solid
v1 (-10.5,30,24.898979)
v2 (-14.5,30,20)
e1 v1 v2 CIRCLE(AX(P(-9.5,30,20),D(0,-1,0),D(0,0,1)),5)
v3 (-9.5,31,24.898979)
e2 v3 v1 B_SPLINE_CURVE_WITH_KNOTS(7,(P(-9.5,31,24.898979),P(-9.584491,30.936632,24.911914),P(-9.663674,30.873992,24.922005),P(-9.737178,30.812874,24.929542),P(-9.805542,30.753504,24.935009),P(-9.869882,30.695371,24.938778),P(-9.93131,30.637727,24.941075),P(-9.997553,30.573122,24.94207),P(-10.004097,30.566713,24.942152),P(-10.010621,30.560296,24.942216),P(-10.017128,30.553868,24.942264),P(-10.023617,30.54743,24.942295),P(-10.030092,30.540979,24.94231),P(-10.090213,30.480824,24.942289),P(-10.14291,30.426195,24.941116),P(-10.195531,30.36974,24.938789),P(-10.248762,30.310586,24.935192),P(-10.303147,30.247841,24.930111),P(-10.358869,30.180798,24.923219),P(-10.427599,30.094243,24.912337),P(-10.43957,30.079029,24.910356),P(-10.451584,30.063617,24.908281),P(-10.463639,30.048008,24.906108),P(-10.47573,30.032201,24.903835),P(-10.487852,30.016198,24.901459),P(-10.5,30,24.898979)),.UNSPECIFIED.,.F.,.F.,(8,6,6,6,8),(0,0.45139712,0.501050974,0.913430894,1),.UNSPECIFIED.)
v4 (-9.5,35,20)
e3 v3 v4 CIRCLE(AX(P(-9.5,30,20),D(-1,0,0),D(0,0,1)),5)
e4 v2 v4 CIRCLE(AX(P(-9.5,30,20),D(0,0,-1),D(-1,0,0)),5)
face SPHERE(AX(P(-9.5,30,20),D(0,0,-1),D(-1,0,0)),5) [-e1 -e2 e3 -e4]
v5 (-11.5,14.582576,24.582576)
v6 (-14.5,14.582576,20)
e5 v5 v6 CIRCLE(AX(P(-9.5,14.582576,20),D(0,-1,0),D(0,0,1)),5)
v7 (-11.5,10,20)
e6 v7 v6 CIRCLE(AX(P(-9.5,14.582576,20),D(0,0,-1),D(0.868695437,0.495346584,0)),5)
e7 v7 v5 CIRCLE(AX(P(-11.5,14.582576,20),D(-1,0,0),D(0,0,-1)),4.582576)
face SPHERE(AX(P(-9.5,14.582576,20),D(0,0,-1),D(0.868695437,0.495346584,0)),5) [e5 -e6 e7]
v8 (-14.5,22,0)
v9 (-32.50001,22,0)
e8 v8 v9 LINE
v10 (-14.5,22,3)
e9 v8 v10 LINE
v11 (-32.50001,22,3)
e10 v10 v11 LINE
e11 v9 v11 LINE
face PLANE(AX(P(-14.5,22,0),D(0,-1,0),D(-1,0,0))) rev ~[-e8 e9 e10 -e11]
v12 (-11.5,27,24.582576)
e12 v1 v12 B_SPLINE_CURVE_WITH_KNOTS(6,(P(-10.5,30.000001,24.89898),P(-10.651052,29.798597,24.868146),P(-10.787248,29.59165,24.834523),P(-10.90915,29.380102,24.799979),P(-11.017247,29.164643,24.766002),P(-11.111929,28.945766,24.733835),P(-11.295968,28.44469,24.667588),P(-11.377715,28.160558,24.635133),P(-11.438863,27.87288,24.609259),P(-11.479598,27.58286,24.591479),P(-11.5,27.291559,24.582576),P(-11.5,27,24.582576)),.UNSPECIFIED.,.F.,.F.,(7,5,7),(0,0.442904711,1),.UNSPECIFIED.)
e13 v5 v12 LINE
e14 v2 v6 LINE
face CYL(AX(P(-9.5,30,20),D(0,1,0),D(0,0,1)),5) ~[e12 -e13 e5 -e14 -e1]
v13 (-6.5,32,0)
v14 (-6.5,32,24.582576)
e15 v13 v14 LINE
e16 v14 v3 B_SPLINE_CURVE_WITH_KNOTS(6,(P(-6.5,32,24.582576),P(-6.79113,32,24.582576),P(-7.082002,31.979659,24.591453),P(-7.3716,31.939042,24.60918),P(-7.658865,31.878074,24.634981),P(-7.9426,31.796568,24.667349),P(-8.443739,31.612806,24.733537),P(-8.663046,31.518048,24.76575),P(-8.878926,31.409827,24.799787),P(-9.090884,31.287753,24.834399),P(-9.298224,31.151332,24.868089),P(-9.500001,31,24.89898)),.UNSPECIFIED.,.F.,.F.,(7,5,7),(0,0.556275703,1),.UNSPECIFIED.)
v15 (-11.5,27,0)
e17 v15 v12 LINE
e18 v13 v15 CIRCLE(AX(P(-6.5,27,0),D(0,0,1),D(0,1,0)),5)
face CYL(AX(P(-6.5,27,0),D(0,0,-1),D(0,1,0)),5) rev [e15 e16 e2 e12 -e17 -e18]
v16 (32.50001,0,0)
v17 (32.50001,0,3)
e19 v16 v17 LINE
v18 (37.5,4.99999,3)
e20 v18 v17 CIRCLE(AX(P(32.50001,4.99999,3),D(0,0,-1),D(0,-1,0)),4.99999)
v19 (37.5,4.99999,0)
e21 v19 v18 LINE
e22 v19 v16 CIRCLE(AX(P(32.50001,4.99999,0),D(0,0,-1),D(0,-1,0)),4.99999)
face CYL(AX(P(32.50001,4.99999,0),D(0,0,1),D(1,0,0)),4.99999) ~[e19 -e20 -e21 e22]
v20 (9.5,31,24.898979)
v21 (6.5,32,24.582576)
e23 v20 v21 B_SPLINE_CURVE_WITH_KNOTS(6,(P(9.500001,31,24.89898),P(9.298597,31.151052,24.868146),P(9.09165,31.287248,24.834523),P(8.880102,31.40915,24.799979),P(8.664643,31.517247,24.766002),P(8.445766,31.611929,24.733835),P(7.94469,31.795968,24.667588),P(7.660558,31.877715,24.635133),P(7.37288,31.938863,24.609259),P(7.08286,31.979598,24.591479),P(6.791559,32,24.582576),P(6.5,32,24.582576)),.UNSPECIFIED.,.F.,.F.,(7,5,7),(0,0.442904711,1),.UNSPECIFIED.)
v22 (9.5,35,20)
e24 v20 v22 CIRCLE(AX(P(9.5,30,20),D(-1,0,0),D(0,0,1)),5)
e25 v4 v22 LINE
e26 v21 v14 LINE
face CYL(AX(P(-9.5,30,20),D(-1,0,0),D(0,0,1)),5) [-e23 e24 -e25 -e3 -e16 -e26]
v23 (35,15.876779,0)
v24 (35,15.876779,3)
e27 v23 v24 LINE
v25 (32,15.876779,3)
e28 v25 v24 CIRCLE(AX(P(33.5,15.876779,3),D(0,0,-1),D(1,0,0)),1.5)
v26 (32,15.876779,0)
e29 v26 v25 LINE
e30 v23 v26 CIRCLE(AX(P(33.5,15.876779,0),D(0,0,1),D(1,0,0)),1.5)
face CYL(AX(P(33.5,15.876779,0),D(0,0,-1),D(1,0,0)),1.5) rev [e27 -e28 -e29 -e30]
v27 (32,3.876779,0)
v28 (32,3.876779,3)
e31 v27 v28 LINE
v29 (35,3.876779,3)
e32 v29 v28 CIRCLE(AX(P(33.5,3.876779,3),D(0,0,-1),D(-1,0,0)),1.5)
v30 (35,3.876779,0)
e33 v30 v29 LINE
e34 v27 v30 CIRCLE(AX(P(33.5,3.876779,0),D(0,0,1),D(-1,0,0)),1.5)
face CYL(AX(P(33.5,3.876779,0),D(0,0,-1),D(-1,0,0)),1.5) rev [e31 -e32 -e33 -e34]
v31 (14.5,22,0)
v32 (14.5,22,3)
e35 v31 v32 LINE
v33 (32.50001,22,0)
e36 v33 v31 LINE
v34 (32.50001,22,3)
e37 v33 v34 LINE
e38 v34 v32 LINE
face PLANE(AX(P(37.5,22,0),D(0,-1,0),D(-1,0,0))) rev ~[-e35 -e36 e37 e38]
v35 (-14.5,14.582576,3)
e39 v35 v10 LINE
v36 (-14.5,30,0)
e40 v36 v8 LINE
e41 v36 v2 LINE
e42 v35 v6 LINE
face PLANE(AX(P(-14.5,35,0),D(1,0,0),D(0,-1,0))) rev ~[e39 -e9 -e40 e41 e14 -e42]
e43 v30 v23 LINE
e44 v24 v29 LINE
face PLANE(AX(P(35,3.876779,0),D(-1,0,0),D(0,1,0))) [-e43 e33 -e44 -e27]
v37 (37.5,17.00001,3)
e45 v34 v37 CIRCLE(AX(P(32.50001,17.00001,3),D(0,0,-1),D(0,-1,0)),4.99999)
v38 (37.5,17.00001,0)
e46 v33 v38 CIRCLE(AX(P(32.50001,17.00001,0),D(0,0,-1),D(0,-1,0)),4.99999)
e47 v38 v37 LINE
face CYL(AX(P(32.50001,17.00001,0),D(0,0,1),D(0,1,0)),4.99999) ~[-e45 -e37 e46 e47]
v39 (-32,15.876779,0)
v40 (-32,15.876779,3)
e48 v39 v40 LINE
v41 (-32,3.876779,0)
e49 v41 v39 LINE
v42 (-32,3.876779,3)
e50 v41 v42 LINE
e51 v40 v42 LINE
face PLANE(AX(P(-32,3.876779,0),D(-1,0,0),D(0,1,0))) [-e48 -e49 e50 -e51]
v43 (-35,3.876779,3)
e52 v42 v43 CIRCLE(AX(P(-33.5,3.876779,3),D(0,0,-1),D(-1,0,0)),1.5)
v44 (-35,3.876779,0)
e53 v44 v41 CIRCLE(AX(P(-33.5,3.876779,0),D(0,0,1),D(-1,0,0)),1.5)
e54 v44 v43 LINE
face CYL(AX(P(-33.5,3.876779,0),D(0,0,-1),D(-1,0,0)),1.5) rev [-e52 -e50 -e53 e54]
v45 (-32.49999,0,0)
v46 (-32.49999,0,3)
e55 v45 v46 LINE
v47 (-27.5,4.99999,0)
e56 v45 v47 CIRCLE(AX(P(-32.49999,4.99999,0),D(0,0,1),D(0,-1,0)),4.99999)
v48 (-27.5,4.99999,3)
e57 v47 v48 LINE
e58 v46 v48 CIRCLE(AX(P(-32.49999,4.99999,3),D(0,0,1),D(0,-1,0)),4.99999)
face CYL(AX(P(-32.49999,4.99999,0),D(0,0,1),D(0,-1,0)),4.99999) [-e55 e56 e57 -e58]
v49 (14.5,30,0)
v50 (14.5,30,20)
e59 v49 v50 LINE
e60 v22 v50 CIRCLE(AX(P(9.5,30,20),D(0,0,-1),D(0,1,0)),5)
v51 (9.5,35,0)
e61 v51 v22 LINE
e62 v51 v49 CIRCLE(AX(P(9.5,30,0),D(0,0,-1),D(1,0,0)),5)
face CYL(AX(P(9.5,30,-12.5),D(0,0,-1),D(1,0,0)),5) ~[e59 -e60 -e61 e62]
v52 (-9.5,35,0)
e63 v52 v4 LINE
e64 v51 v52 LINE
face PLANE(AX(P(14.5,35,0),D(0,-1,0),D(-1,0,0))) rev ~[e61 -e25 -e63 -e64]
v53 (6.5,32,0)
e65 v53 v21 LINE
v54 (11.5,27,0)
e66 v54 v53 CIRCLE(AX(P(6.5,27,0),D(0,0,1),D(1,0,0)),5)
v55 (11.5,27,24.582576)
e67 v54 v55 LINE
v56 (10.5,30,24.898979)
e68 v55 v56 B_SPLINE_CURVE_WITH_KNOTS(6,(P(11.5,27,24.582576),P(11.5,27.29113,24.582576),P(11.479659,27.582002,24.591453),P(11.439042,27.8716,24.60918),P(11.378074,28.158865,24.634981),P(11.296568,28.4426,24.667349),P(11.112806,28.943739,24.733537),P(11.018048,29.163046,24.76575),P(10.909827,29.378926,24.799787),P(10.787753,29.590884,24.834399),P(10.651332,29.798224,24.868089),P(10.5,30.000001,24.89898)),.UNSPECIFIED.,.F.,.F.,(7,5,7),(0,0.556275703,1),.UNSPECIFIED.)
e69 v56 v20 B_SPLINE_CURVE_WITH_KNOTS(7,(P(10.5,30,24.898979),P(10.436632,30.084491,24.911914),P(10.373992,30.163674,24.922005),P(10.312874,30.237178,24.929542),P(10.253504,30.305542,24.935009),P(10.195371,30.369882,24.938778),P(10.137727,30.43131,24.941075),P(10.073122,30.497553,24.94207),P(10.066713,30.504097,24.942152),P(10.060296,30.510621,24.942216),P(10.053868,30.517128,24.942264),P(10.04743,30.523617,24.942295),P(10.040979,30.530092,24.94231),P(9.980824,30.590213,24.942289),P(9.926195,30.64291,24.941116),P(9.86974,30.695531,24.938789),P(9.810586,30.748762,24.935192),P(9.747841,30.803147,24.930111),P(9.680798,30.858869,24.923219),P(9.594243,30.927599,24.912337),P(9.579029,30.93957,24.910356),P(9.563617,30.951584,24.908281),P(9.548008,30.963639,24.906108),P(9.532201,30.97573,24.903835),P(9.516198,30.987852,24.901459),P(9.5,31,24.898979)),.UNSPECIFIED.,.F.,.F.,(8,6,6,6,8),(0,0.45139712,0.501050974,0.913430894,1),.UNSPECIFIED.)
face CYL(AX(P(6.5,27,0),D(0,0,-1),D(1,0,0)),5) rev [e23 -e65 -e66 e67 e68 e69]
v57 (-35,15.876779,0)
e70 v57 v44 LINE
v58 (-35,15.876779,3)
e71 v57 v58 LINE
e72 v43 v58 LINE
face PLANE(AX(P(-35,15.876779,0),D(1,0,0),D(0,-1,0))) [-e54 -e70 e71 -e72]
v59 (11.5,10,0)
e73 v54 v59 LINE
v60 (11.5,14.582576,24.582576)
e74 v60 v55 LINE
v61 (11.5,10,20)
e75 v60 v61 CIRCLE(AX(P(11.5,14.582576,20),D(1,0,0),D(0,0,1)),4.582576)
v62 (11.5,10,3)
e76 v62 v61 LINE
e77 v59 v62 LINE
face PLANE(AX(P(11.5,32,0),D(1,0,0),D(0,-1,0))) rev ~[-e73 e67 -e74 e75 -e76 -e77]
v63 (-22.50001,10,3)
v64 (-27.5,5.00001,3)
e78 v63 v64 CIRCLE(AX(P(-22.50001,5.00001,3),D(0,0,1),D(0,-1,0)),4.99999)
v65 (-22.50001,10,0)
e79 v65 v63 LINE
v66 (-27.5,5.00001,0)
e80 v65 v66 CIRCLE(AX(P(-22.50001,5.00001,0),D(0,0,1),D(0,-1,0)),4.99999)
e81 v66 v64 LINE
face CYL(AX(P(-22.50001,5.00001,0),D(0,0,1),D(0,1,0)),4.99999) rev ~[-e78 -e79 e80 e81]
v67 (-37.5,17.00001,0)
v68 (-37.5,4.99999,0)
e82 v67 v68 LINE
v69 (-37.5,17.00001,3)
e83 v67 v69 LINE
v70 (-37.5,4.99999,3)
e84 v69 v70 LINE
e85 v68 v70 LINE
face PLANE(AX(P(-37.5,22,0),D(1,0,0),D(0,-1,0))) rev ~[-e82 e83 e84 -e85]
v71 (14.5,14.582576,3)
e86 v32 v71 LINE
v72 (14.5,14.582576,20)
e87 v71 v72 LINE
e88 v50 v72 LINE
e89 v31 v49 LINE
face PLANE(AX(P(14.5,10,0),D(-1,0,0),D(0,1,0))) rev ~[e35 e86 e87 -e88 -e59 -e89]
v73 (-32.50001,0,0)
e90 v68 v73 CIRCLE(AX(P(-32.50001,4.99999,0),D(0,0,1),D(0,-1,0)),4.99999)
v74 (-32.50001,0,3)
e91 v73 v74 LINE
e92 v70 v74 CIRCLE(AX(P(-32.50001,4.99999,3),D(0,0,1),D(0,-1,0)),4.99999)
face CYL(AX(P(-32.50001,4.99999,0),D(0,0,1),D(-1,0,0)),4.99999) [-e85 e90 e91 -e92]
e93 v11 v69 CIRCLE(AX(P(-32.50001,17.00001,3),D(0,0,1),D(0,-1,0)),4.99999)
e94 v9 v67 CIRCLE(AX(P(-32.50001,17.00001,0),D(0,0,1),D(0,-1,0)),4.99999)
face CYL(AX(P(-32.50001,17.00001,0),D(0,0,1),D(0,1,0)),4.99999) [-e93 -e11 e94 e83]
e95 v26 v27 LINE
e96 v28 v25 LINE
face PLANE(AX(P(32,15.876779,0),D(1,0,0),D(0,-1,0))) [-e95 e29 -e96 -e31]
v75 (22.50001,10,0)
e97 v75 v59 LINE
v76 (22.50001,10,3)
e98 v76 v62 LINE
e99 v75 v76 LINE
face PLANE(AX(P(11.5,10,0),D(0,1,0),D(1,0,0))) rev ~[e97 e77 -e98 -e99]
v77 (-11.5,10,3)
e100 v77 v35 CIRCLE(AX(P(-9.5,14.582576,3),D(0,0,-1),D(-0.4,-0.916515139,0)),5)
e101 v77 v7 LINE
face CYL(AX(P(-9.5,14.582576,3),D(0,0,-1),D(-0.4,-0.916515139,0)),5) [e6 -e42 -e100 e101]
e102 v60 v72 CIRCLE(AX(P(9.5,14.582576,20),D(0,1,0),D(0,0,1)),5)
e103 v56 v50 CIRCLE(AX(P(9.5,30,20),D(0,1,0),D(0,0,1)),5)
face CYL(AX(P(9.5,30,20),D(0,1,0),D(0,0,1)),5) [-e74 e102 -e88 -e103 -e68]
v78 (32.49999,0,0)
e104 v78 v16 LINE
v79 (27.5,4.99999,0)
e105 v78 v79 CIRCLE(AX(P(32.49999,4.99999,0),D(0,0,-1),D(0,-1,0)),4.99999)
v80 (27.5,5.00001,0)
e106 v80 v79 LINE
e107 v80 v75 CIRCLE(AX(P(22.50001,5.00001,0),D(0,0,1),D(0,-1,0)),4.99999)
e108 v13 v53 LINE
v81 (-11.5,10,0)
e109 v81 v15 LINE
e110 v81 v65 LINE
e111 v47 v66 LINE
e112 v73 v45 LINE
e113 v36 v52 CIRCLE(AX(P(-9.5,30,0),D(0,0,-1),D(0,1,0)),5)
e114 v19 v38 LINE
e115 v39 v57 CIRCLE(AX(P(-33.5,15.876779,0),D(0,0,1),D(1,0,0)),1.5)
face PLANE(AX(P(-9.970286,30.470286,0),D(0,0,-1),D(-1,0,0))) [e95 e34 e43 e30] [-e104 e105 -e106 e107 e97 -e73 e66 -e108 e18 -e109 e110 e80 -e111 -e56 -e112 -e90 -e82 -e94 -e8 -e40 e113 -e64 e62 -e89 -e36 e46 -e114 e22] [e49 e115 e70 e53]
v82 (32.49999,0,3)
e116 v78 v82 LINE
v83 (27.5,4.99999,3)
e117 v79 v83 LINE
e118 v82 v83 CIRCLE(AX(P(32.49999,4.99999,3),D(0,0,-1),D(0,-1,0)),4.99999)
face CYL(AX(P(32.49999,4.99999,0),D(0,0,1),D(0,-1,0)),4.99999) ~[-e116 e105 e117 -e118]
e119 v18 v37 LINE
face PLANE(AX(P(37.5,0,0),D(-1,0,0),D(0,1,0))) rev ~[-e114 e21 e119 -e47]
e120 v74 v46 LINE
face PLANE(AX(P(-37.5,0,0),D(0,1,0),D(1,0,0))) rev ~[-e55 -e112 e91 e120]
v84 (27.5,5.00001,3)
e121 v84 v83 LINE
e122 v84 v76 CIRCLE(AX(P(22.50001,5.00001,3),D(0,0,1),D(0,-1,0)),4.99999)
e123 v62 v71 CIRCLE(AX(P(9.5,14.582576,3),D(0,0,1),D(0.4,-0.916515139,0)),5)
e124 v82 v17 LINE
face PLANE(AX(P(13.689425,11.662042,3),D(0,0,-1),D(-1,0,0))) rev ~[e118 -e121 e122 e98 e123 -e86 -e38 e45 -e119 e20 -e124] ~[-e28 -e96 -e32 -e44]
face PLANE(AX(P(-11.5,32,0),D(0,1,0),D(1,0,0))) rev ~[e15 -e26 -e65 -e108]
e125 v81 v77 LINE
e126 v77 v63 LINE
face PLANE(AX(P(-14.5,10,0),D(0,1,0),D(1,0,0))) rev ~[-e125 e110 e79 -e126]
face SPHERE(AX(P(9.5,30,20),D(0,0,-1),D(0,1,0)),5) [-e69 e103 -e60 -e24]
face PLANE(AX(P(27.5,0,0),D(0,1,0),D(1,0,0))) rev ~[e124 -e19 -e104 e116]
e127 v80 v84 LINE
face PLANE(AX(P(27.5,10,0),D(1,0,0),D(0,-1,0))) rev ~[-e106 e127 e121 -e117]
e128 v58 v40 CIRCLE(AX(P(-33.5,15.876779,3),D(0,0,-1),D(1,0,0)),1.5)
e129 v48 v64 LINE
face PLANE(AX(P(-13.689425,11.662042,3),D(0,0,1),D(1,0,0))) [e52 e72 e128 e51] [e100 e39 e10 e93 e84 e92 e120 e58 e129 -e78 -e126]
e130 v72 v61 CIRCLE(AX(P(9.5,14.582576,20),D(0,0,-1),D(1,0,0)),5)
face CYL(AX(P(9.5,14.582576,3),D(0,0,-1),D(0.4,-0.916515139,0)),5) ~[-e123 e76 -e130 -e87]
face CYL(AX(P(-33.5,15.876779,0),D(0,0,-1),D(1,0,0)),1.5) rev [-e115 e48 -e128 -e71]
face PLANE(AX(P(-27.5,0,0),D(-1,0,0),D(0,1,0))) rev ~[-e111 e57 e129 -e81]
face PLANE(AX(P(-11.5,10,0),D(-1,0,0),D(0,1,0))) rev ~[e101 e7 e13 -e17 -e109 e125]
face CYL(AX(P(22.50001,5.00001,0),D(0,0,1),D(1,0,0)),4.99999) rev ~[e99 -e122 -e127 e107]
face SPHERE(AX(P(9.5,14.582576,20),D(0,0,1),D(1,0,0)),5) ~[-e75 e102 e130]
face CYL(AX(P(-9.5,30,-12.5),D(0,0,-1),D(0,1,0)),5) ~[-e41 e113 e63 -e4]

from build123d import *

# Parameters (mm, degrees)
F2_DEPTH     = 25
F3_DEPTH     = 3
F4_DEPTH     = 25
F5_R         = 4.99999
F6_T1_DEPTH  = 25
F6_T3_DEPTH  = 25
F6_T5_DEPTH  = 50
F6_T7_DEPTH  = 33.4564392374
F6_T9_DEPTH  = 50
F6_T11_DEPTH = 33.4564392374
F7_T1_DEPTH  = 15.417424305
F7_T3_DEPTH  = 19
F7_T6_ANGLE  = 89.9999999974
F7_T8_ANGLE  = 89.9999999974
F7_T10_ANGLE = 209.6926070845
F7_T12_ANGLE = 209.6926070845


# Not quite as in the source:
# - a fillet or chamfer that OpenCascade refuses, or shapes differently, is made with other operations: its cross-section is extruded or revolved along the edge and cut away or added
# - a fillet or chamfer is up to 0.001 mm smaller than in the source, because OpenCascade refuses the exact size


with BuildPart() as f2:
    # F0 (on Top) → F2 (new body)
    with BuildSketch(Plane.XY):
        Polygon((14.5, 35), (0, 35), (-14.5, 35), (-14.5, 22), (-14.5, 10), (-11.5, 10), (-11.5, 32), (0, 32), (11.5, 32), (11.5, 10), (14.5, 10), (14.5, 22), align=None)
    extrude(amount=F2_DEPTH)

    # F0 (on Top) → F3 (join)
    with BuildSketch(Plane.XY):
        Polygon((-14.5, 10), (-14.5, 22), (-37.5, 22), (-37.5, 0), (-27.5, 0), (-27.5, 10), align=None)
        Polygon((37.5, 22), (14.5, 22), (14.5, 10), (27.5, 10), (27.5, 0), (37.5, 0), align=None)
    extrude(amount=F3_DEPTH)

    # F1 (on Top) → F4 (cut)
    with BuildSketch(Plane.XY):
        with BuildLine():
            Line((35, 3.8767794613), (35, 15.8767794613))
            ThreePointArc((35, 15.8767794613), (33.5, 17.3767794613), (32, 15.8767794613))
            Line((32, 15.8767794613), (32, 3.8767794613))
            ThreePointArc((32, 3.8767794613), (33.5, 2.3767794613), (35, 3.8767794613))
        make_face()
        with BuildLine():
            ThreePointArc((-32, 15.8767794613), (-33.5, 17.3767794613), (-35, 15.8767794613))
            Line((-35, 15.8767794613), (-35, 3.8767794613))
            ThreePointArc((-35, 3.8767794613), (-33.5, 2.3767794613), (-32, 3.8767794613))
            Line((-32, 3.8767794613), (-32, 15.8767794613))
        make_face()
    extrude(amount=F4_DEPTH, mode=Mode.SUBTRACT)

    # F5 (radius 5 in the source; OpenCascade refuses exactly that, so slightly less here)
    f5_edges = [f2.edges().sort_by_distance(p)[0] for p in [
        (-37.5, 0, 1.5),
        (-27.5, 0, 1.5),
        (-37.5, 22, 1.5),
        (37.5, 22, 1.5),
        (37.5, 0, 1.5),
        (27.5, 0, 1.5),
        (27.5, 10, 1.5),
        (-27.5, 10, 1.5),
    ]]
    fillet(f5_edges, radius=F5_R)

    # F6: fillet of radius 5 on 6 edges, made by hand

    # F6_s2 → F6_t1 (join)
    with BuildSketch(Plane.XY):
        with BuildLine():
            ThreePointArc((11.5, 27), (10.0355339059, 30.5355339059), (6.5, 32))
            Line((6.5, 32), (11.5, 32))
            Line((11.5, 32), (11.5, 27))
        make_face()
    extrude(amount=F6_T1_DEPTH)

    # F6_s4 → F6_t3 (join)
    with BuildSketch(Plane.XY):
        with BuildLine():
            ThreePointArc((-6.5, 32), (-10.0355339059, 30.5355339059), (-11.5, 27))
            Line((-11.5, 27), (-11.5, 32))
            Line((-11.5, 32), (-6.5, 32))
        make_face()
    extrude(amount=F6_T3_DEPTH)

    # F6_s6 → F6_t5 (cut)
    with BuildSketch(Plane.XY.offset(-12.5)):
        with BuildLine():
            ThreePointArc((14.5, 30), (13.0355339059, 33.5355339059), (9.5, 35))
            Line((9.5, 35), (14.5, 35))
            Line((14.5, 35), (14.5, 30))
        make_face()
    extrude(amount=F6_T5_DEPTH, mode=Mode.SUBTRACT)

    # F6_s8 → F6_t7 (cut)
    with BuildSketch(Plane.XY.offset(3)):
        with BuildLine():
            ThreePointArc((11.5, 10), (13.6833001327, 11.8439629074), (14.5, 14.582575695))
            Line((14.5, 14.582575695), (14.5, 10))
            Line((14.5, 10), (11.5, 10))
        make_face()
    extrude(amount=F6_T7_DEPTH, mode=Mode.SUBTRACT)

    # F6_s10 → F6_t9 (cut)
    with BuildSketch(Plane.XY.offset(-12.5)):
        with BuildLine():
            ThreePointArc((-9.5, 35), (-13.0355339059, 33.5355339059), (-14.5, 30))
            Line((-14.5, 30), (-14.5, 35))
            Line((-14.5, 35), (-9.5, 35))
        make_face()
    extrude(amount=F6_T9_DEPTH, mode=Mode.SUBTRACT)

    # F6_s12 → F6_t11 (cut)
    with BuildSketch(Plane.XY.offset(3)):
        with BuildLine():
            ThreePointArc((-11.5, 10), (-13.6833001327, 11.8439629074), (-14.5, 14.582575695))
            Line((-14.5, 14.582575695), (-14.5, 10))
            Line((-14.5, 10), (-11.5, 10))
        make_face()
    extrude(amount=F6_T11_DEPTH, mode=Mode.SUBTRACT)

    # F7: fillet of radius 5 on 3 edges, made by hand

    # F7_s2 → F7_t1 (cut)
    with BuildSketch(Plane.XZ.offset(-30)):
        with BuildLine():
            ThreePointArc((-9.5, 25), (-13.0355339059, 23.5355339059), (-14.5, 20))
            Line((-14.5, 20), (-14.5, 25))
            Line((-14.5, 25), (-9.5, 25))
        make_face()
        with BuildLine():
            ThreePointArc((9.5, 25), (13.0355339059, 23.5355339059), (14.5, 20))
            Line((14.5, 20), (14.5, 25))
            Line((14.5, 25), (9.5, 25))
        make_face()
    extrude(amount=F7_T1_DEPTH, mode=Mode.SUBTRACT)

    # F7_s4 → F7_t3 (cut)
    with BuildSketch(Plane.YZ.offset(-9.5)):
        with BuildLine():
            ThreePointArc((30, 25), (33.5355339059, 23.5355339059), (35, 20))
            Line((35, 20), (35, 25))
            Line((35, 25), (30, 25))
        make_face()
    extrude(amount=F7_T3_DEPTH, mode=Mode.SUBTRACT)

    # F7_s5 → F7_t6 (revolve, cut)
    with BuildSketch(Plane.YZ.offset(9.4999999999)):
        with BuildLine():
            ThreePointArc((30, 25), (33.5355339059, 23.5355339059), (35, 20))
            Line((35, 20), (35, 25))
            Line((35, 25), (30, 25))
        make_face()
    revolve(axis=Axis((9.4999999999, 29.9999999999, 25), (0, 0, -1)), revolution_arc=F7_T6_ANGLE, mode=Mode.SUBTRACT)

    # F7_s7 → F7_t8 (revolve, cut)
    with BuildSketch(Plane.XZ.offset(-29.9999999999)):
        with BuildLine():
            ThreePointArc((-9.5, 25), (-13.0355339059, 23.5355339059), (-14.5, 20))
            Line((-14.5, 20), (-14.5, 25))
            Line((-14.5, 25), (-9.5, 25))
        make_face()
    revolve(axis=Axis((-9.4999999999, 29.9999999999, 25), (0, 0, -1)), revolution_arc=F7_T8_ANGLE, mode=Mode.SUBTRACT)

    # F7_s9 → F7_t10 (revolve, cut)
    with BuildSketch(Plane.XZ.offset(-14.5825756948)):
        with BuildLine():
            ThreePointArc((14.5, 20), (13.0355339059, 23.5355339059), (9.5, 25))
            Line((9.5, 25), (14.5, 25))
            Line((14.5, 25), (14.5, 20))
        make_face()
    revolve(axis=Axis((9.5000000002, 14.5825756948, 25), (0, 0, -1)), revolution_arc=F7_T10_ANGLE, mode=Mode.SUBTRACT)

    # F7_s11 → F7_t12 (revolve, cut)
    with BuildSketch(Plane(origin=(-8.6059581245, 15.0923752984, 0), x_dir=(0, 0, 1), z_dir=(-0.4953465841, 0.8686954366, 0))):
        with BuildLine():
            ThreePointArc((25, -1.02917759), (23.5355339059, 2.506356316), (20, 3.97082241))
            Line((20, 3.97082241), (25, 3.97082241))
            Line((25, 3.97082241), (25, -1.02917759))
        make_face()
    revolve(axis=Axis((-9.5000000002, 14.5825756948, 25), (0, 0, -1)), revolution_arc=F7_T12_ANGLE, mode=Mode.SUBTRACT)


solid = f2.part
